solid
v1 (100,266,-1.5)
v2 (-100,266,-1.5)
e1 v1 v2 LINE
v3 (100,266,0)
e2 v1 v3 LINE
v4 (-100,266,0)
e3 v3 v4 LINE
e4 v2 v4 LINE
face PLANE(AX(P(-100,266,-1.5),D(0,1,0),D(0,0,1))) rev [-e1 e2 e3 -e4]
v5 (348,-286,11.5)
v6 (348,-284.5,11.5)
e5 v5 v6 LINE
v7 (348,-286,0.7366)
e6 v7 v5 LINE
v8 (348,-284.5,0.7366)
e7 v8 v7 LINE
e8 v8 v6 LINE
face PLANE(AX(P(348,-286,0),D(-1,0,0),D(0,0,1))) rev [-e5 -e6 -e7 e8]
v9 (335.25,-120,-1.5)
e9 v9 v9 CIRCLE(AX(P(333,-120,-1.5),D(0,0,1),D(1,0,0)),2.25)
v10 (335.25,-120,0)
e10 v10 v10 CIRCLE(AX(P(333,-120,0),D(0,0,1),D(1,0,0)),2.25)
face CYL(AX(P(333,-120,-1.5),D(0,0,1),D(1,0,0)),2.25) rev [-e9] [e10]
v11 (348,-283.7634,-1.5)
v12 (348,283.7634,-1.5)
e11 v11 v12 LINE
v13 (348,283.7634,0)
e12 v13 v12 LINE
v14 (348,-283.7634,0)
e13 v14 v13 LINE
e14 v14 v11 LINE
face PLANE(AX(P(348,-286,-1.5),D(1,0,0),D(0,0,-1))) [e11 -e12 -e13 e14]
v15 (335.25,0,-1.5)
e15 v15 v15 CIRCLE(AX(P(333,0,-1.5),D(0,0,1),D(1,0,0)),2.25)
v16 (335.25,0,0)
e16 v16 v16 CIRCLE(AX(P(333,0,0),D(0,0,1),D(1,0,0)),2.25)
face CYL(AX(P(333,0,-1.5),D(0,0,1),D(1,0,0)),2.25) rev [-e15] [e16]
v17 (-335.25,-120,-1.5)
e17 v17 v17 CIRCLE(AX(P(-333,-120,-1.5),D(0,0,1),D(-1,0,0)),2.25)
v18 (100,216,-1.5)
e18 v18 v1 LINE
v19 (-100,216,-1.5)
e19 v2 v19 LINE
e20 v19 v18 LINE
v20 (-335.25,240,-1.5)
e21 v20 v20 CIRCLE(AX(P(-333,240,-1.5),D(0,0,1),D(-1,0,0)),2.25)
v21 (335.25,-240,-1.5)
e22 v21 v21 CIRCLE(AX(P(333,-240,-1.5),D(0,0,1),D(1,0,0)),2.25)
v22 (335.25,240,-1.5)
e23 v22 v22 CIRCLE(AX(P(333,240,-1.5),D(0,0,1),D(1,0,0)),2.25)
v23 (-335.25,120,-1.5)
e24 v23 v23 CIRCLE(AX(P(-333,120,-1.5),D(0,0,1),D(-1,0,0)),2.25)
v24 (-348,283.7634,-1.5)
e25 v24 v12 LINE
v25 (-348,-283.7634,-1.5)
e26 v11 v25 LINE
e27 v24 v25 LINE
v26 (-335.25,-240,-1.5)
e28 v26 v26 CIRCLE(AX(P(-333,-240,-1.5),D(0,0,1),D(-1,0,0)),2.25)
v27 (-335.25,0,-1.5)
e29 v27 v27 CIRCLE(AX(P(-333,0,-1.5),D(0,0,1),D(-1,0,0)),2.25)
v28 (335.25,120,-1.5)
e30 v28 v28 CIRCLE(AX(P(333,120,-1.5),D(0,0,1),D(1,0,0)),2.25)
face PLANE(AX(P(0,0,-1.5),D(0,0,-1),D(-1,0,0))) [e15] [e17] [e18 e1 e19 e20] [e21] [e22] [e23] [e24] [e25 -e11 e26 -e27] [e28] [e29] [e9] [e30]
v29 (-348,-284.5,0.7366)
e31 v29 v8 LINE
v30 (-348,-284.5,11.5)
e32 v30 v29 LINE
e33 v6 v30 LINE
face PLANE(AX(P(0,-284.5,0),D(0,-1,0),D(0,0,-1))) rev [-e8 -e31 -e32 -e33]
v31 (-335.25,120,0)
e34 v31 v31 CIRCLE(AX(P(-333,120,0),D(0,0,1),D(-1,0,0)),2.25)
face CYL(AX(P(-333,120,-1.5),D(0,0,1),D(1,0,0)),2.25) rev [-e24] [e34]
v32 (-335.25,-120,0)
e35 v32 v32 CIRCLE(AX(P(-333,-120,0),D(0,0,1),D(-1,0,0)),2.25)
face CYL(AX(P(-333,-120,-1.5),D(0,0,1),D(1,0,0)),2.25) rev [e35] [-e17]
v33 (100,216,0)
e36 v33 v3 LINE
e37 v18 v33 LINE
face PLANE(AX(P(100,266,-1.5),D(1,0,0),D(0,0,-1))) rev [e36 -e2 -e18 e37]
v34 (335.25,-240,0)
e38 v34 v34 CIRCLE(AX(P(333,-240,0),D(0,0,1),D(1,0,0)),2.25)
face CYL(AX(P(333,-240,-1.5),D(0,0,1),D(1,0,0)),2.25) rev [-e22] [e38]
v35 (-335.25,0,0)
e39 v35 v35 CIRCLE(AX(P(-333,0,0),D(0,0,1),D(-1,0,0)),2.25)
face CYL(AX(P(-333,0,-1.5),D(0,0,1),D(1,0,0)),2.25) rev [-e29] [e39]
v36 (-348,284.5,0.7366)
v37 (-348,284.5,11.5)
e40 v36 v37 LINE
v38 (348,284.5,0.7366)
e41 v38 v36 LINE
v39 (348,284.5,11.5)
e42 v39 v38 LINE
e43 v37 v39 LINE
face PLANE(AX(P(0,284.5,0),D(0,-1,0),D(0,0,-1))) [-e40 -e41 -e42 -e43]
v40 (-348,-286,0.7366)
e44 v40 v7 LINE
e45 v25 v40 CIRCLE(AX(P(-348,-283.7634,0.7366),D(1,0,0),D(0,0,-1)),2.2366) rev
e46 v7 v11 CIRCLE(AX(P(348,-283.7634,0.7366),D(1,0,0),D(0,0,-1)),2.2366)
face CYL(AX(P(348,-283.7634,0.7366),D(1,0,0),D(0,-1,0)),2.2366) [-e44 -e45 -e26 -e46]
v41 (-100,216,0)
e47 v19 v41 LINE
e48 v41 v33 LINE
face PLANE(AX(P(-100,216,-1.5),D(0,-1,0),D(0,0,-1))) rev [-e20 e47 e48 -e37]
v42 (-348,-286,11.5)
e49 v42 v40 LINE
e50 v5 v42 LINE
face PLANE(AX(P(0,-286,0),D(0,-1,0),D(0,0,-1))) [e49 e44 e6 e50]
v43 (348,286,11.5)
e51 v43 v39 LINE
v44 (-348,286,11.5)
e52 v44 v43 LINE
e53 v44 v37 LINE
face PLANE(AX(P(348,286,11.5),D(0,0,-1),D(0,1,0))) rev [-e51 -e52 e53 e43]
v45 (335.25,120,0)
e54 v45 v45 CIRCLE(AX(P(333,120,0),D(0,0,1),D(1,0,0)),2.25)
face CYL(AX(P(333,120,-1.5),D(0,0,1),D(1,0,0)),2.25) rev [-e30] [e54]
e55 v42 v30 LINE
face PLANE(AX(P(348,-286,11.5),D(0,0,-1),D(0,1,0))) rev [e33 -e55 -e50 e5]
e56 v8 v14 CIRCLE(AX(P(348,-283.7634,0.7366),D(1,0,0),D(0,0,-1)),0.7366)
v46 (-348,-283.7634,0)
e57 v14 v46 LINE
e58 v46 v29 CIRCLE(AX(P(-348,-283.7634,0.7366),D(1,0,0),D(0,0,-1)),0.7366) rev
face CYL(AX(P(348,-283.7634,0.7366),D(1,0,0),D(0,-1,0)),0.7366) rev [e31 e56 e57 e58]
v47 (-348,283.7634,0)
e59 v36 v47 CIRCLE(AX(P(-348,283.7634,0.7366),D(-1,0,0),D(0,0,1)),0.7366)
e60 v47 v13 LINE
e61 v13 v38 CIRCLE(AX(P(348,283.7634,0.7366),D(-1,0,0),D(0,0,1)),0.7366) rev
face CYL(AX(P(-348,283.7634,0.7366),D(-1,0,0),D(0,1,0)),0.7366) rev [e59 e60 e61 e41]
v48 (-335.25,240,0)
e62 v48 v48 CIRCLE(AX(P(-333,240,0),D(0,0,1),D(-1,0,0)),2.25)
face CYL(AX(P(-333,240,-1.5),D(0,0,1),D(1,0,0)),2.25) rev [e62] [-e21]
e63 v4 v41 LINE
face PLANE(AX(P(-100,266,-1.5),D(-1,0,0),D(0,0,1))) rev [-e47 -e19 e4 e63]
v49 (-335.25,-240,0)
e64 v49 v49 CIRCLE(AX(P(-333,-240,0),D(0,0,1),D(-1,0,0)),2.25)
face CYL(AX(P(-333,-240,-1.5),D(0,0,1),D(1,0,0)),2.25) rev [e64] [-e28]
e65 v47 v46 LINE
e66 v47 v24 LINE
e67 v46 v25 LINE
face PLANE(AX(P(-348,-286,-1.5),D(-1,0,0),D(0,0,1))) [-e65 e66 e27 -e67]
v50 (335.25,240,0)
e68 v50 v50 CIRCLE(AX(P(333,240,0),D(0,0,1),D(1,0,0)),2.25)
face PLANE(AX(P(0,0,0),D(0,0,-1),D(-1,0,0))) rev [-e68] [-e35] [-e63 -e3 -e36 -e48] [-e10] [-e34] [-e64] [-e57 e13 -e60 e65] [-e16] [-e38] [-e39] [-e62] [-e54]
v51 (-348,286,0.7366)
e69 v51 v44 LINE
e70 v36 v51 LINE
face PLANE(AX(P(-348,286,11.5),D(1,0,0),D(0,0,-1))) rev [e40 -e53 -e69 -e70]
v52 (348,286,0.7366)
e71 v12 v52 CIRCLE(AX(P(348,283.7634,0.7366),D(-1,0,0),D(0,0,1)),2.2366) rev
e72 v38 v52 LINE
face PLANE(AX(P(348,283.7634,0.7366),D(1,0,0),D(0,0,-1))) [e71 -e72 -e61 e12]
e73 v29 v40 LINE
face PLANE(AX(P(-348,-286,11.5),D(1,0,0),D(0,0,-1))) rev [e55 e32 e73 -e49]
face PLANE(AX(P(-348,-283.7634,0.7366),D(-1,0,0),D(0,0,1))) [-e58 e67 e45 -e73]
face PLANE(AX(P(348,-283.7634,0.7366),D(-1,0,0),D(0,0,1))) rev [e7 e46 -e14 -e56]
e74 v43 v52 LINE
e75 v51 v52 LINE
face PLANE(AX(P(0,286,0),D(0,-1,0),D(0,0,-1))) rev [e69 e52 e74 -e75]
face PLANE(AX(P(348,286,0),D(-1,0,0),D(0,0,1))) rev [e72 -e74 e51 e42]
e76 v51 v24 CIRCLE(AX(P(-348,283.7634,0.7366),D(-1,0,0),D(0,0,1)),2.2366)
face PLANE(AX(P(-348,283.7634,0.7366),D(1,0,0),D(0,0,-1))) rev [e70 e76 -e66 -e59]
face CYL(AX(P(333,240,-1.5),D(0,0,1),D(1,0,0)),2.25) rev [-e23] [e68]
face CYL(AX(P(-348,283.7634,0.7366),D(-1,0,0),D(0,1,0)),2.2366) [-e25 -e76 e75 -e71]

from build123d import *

# Parameters (mm, degrees)
SKETCH_1_W                         = 696
SKETCH_1_H                         = 572
SM_BASE_FLANGE_1_DEPTH             = 1.5
SM_EDGE_FLANGE_1_STRIP_W           = 7.4732
SM_EDGE_FLANGE_1_STRIP_H           = 1.5
SM_EDGE_FLANGE_1_STRIP_CUT_DEPTH   = 696
SM_EDGE_FLANGE_1_STRIP_2_W         = 7.4732
SM_EDGE_FLANGE_1_STRIP_2_H         = 1.5
SM_EDGE_FLANGE_1_STRIP_CUT_2_DEPTH = 696
SM_EDGE_FLANGE_1_DEPTH             = 696
SM_EDGE_FLANGE_1_BEND_DEPTH        = 696
SKETCH_8_R                         = 2.25
CUT_EXTRUDE_1_DEPTH                = 10
PATTERN_LINEAR_1_COUNT             = 3
PATTERN_LINEAR_1_PITCH             = 120
PATTERN_LINEAR_1_COL_COUNT         = 3
PATTERN_LINEAR_1_COL_PITCH         = 120
SKETCH_9_W                         = 200
SKETCH_9_H                         = 50
CUT_EXTRUDE_2_DEPTH                = 10


# Sheet-metal steps are written as plain solids
with BuildPart() as part:
    # Sketch 1 → Базовая кромка1 (new body)
    with BuildSketch(Plane.XY):
        Rectangle(SKETCH_1_W, SKETCH_1_H)
    extrude(amount=-SM_BASE_FLANGE_1_DEPTH)

    # Ребро-кромка1 strip (across the edge) → Ребро-кромка1 strip cut (cut)
    with BuildSketch(Plane(origin=(348, 286, 0), x_dir=(0, -1, 0), z_dir=(-1, 0, 0))):
        with Locations((-1.5, -0.75)):
            Rectangle(SM_EDGE_FLANGE_1_STRIP_W, SM_EDGE_FLANGE_1_STRIP_H)
    extrude(amount=SM_EDGE_FLANGE_1_STRIP_CUT_DEPTH, mode=Mode.SUBTRACT)

    # Ребро-кромка1 strip 2 (across the edge) → Ребро-кромка1 strip cut 2 (cut)
    with BuildSketch(Plane(origin=(-348, -286, 0), x_dir=(0, 1, 0), z_dir=(1, 0, 0))):
        with Locations((-1.5, -0.75)):
            Rectangle(SM_EDGE_FLANGE_1_STRIP_2_W, SM_EDGE_FLANGE_1_STRIP_2_H)
    extrude(amount=SM_EDGE_FLANGE_1_STRIP_CUT_2_DEPTH, mode=Mode.SUBTRACT)

    # Ребро-кромка1 section (across the edge) → Ребро-кромка1 (add)
    with BuildSketch(Plane(origin=(348, 286, 0), x_dir=(0, -1, 0), z_dir=(-1, 0, 0))):
        with BuildLine():
            Line((0, 0.7366), (0, 11.5))
            Line((0, 11.5), (1.5, 11.5))
            Line((1.5, 11.5), (1.5, 0.7366))
            ThreePointArc((1.5, 0.7366), (1.715745145, 0.215745145), (2.2366, 0))
            Line((2.2366, 0), (2.2366, -1.5))
            ThreePointArc((2.2366, -1.5), (0.655084973, -0.844915027), (0, 0.7366))
        make_face()
    extrude(amount=SM_EDGE_FLANGE_1_DEPTH)

    # Ребро-кромка1 section 2 (across the edge) → Ребро-кромка1 bend (add)
    with BuildSketch(Plane(origin=(-348, -286, 0), x_dir=(0, 1, 0), z_dir=(1, 0, 0))):
        with BuildLine():
            Line((0, 0.7366), (0, 11.5))
            Line((0, 11.5), (1.5, 11.5))
            Line((1.5, 11.5), (1.5, 0.7366))
            ThreePointArc((1.5, 0.7366), (1.715745145, 0.215745145), (2.2366, 0))
            Line((2.2366, 0), (2.2366, -1.5))
            ThreePointArc((2.2366, -1.5), (0.655084973, -0.844915027), (0, 0.7366))
        make_face()
    extrude(amount=SM_EDGE_FLANGE_1_BEND_DEPTH)

    # Эскиз8 → Вырез-Вытянуть1 (cut)
    with BuildSketch(Plane.XY):
        with Locations((333, 0)):
            Circle(SKETCH_8_R)
        with Locations(Location((-333, 0, 0), (0, 0, 180))):
            Circle(SKETCH_8_R)
    cut_extrude_1 = extrude(amount=-CUT_EXTRUDE_1_DEPTH, mode=Mode.SUBTRACT)

    # Линейный массив1: Вырез-Вытянуть1 ×3
    with Locations(*[(0, -i * PATTERN_LINEAR_1_PITCH, 0) for i in range(1, PATTERN_LINEAR_1_COUNT)]):
        add(cut_extrude_1, mode=Mode.SUBTRACT)

    # Линейный массив1 col: Вырез-Вытянуть1 ×3
    with Locations(*[(0, i * PATTERN_LINEAR_1_COL_PITCH, 0) for i in range(1, PATTERN_LINEAR_1_COL_COUNT)]):
        add(cut_extrude_1, mode=Mode.SUBTRACT)

    # Эскиз9 → Вырез-Вытянуть2 (cut)
    with BuildSketch(Plane.XY):
        with Locations((0, 241)):
            Rectangle(SKETCH_9_W, SKETCH_9_H)
    extrude(amount=-CUT_EXTRUDE_2_DEPTH, mode=Mode.SUBTRACT)


solid = part.part
